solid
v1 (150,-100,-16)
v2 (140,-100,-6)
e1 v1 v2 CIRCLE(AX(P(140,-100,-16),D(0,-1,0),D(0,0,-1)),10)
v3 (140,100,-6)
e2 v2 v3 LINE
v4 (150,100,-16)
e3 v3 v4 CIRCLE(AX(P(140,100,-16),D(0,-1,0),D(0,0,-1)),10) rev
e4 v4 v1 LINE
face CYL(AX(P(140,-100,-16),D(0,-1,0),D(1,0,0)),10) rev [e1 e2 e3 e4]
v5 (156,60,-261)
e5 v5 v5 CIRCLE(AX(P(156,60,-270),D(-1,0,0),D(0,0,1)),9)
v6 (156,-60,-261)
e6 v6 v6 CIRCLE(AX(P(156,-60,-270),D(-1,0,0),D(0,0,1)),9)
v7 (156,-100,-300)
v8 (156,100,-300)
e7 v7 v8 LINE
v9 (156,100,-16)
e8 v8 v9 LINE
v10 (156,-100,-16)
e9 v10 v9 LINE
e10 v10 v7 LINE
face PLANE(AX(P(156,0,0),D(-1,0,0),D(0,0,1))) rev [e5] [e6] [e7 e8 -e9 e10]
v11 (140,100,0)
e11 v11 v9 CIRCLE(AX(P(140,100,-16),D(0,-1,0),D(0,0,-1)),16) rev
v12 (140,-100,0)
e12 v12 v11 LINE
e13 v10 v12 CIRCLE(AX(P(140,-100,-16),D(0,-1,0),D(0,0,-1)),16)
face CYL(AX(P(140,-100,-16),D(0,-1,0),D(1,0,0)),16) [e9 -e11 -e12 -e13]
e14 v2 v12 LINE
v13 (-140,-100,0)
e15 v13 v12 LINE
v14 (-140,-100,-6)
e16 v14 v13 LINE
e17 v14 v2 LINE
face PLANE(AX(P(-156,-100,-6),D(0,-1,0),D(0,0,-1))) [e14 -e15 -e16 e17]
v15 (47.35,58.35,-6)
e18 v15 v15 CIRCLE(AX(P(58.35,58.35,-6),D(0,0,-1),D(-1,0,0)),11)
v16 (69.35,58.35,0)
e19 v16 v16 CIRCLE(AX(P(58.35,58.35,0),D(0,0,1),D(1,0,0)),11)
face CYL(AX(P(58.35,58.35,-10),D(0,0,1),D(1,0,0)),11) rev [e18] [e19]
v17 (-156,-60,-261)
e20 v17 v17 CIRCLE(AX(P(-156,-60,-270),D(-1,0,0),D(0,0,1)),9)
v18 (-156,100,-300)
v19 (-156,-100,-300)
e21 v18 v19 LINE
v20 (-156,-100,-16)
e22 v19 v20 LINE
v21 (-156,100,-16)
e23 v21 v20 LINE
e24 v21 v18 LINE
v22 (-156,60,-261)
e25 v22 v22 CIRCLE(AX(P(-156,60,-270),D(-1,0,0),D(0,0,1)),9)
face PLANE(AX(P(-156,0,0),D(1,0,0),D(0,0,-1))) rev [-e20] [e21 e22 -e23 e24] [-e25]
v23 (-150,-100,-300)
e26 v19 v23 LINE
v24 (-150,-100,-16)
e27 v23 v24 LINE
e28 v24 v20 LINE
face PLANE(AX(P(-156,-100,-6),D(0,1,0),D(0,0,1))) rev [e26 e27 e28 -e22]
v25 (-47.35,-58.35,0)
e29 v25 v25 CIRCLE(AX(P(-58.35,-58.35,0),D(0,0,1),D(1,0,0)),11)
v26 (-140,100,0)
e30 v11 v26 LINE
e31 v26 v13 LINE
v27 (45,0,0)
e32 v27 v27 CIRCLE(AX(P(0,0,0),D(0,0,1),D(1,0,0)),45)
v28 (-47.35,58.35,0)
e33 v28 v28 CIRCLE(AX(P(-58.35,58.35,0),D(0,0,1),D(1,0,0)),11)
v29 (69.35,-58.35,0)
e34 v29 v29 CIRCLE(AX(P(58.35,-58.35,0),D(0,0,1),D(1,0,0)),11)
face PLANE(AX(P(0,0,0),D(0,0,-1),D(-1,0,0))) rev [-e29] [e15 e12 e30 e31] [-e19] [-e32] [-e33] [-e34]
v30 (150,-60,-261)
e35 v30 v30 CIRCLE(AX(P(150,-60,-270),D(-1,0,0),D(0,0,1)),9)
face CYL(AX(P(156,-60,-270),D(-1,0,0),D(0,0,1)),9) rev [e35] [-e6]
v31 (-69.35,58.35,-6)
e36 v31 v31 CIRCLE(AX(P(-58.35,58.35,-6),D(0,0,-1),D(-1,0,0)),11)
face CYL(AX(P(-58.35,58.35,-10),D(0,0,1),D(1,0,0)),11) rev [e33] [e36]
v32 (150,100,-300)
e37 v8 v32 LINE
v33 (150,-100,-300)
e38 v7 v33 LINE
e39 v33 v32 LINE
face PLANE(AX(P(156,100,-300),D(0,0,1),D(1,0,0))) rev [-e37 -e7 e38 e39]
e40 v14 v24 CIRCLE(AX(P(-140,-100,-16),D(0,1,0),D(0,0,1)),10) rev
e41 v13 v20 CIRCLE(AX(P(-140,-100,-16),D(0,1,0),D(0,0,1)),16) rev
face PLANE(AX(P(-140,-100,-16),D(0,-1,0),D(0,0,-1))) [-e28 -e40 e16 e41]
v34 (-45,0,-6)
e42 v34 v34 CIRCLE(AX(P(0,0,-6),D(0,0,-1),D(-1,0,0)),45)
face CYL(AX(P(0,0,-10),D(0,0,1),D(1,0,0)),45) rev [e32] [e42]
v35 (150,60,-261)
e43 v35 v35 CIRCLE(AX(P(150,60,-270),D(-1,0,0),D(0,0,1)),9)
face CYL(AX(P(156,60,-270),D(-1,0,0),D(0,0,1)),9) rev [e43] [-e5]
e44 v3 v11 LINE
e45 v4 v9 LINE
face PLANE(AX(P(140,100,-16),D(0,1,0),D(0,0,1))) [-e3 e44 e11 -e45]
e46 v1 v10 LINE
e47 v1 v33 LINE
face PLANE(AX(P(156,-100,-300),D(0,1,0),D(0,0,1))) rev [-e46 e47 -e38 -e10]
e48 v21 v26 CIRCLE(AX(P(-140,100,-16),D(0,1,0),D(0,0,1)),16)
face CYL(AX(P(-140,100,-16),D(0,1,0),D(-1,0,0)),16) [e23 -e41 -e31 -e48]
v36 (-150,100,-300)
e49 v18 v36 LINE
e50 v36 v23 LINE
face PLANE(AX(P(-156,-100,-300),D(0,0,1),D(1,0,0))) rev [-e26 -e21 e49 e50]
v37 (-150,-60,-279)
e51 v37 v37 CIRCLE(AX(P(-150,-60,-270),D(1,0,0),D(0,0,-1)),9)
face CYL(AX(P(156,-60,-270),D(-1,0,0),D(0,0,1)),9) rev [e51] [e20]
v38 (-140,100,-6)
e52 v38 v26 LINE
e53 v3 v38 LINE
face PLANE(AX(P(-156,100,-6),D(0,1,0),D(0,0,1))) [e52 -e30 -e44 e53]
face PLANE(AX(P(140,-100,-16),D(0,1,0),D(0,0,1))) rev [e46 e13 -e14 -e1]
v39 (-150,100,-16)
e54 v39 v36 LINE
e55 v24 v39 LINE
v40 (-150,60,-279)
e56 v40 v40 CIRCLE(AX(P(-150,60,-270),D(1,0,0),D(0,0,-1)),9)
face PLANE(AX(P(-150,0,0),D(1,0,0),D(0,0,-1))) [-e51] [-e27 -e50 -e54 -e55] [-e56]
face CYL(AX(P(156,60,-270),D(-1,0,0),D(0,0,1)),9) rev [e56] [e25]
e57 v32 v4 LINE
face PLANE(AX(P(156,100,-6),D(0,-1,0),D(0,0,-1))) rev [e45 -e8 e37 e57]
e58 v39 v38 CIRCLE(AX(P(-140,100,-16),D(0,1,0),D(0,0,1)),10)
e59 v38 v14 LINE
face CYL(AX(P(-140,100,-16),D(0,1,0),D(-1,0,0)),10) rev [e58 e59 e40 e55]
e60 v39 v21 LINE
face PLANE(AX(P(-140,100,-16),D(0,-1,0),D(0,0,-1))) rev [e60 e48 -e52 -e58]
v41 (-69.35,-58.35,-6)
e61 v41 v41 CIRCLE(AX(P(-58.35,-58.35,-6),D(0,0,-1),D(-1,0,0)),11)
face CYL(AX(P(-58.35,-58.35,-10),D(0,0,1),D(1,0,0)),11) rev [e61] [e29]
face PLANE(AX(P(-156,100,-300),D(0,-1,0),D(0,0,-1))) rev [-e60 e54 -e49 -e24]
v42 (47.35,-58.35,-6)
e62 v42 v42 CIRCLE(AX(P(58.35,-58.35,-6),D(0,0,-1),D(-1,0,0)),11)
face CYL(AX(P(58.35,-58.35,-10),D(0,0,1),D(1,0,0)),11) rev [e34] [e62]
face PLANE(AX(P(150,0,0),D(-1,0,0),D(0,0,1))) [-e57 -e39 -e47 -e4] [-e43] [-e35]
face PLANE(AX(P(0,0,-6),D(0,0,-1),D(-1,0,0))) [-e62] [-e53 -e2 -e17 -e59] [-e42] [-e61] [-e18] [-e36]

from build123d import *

# Parameters (mm, degrees)
SKETCH1_W                    = 312
SKETCH1_H                    = 200
BASE_FLANGE1_DEPTH           = 6
EDGE_FLANGE1_STRIP_W         = 44
EDGE_FLANGE1_STRIP_H         = 6
EDGE_FLANGE1_STRIP_CUT_DEPTH = 200
EDGE_FLANGE1_DEPTH           = 200
EDGE_FLANGE2_STRIP_W         = 44
EDGE_FLANGE2_STRIP_H         = 6
EDGE_FLANGE2_STRIP_CUT_DEPTH = 200
EDGE_FLANGE2_DEPTH           = 200
SKETCH24_R                   = 45
CUT_EXTRUDE1_DEPTH           = 10
SKETCH27_R                   = 11
CUT_EXTRUDE4_DEPTH           = 10
SKETCH28_R                   = 9
CUT_EXTRUDE5_DEPTH           = 445.234172481


# Sheet-metal steps are written as plain solids
with BuildPart() as part:
    # Sketch1 → Base-Flange1 (new body)
    with BuildSketch(Plane.XY):
        Rectangle(SKETCH1_W, SKETCH1_H)
    extrude(amount=-BASE_FLANGE1_DEPTH)

    # Edge-Flange1 strip (across the edge) → Edge-Flange1 strip cut (cut)
    with BuildSketch(Plane(origin=(-156, -100, -6), x_dir=(1, 0, 0), z_dir=(0, 1, 0))):
        with Locations((-6, -3)):
            Rectangle(EDGE_FLANGE1_STRIP_W, EDGE_FLANGE1_STRIP_H)
    extrude(amount=EDGE_FLANGE1_STRIP_CUT_DEPTH, mode=Mode.SUBTRACT)

    # Edge-Flange1 section (across the edge) → Edge-Flange1 (add)
    with BuildSketch(Plane(origin=(-156, -100, -6), x_dir=(1, 0, 0), z_dir=(0, 1, 0))):
        with BuildLine():
            Line((0, 10), (0, 294))
            Line((0, 294), (6, 294))
            Line((6, 294), (6, 10))
            ThreePointArc((6, 10), (8.928932188, 2.928932188), (16, 0))
            Line((16, 0), (16, -6))
            ThreePointArc((16, -6), (4.686291501, -1.313708499), (0, 10))
        make_face()
    extrude(amount=EDGE_FLANGE1_DEPTH)

    # Edge-Flange2 strip (across the edge) → Edge-Flange2 strip cut (cut)
    with BuildSketch(Plane(origin=(156, 100, -6), x_dir=(-1, 0, 0), z_dir=(0, -1, 0))):
        with Locations((-6, -3)):
            Rectangle(EDGE_FLANGE2_STRIP_W, EDGE_FLANGE2_STRIP_H)
    extrude(amount=EDGE_FLANGE2_STRIP_CUT_DEPTH, mode=Mode.SUBTRACT)

    # Edge-Flange2 section (across the edge) → Edge-Flange2 (add)
    with BuildSketch(Plane(origin=(156, 100, -6), x_dir=(-1, 0, 0), z_dir=(0, -1, 0))):
        with BuildLine():
            Line((0, 10), (0, 294))
            Line((0, 294), (6, 294))
            Line((6, 294), (6, 10))
            ThreePointArc((6, 10), (8.928932188, 2.928932188), (16, 0))
            Line((16, 0), (16, -6))
            ThreePointArc((16, -6), (4.686291501, -1.313708499), (0, 10))
        make_face()
    extrude(amount=EDGE_FLANGE2_DEPTH)

    # Sketch24 → Cut-Extrude1 (cut)
    with BuildSketch(Plane.XY):
        Circle(SKETCH24_R)
    extrude(amount=-CUT_EXTRUDE1_DEPTH, mode=Mode.SUBTRACT)

    # Sketch27 → Cut-Extrude4 (cut)
    with BuildSketch(Plane.XY):
        with Locations((58.35, 58.35)):
            Circle(SKETCH27_R)
        with Locations((58.35, -58.35)):
            Circle(SKETCH27_R)
        with Locations((-58.35, -58.35)):
            Circle(SKETCH27_R)
        with Locations((-58.35, 58.35)):
            Circle(SKETCH27_R)
    extrude(amount=-CUT_EXTRUDE4_DEPTH, mode=Mode.SUBTRACT)

    # Sketch28 → Cut-Extrude5 (cut, through all)
    with BuildSketch(Plane.ZY.offset(156)):
        with Locations((-270, 60)):
            Circle(SKETCH28_R)
        with Locations((-270, -60)):
            Circle(SKETCH28_R)
    extrude(amount=-CUT_EXTRUDE5_DEPTH, mode=Mode.SUBTRACT)


solid = part.part
